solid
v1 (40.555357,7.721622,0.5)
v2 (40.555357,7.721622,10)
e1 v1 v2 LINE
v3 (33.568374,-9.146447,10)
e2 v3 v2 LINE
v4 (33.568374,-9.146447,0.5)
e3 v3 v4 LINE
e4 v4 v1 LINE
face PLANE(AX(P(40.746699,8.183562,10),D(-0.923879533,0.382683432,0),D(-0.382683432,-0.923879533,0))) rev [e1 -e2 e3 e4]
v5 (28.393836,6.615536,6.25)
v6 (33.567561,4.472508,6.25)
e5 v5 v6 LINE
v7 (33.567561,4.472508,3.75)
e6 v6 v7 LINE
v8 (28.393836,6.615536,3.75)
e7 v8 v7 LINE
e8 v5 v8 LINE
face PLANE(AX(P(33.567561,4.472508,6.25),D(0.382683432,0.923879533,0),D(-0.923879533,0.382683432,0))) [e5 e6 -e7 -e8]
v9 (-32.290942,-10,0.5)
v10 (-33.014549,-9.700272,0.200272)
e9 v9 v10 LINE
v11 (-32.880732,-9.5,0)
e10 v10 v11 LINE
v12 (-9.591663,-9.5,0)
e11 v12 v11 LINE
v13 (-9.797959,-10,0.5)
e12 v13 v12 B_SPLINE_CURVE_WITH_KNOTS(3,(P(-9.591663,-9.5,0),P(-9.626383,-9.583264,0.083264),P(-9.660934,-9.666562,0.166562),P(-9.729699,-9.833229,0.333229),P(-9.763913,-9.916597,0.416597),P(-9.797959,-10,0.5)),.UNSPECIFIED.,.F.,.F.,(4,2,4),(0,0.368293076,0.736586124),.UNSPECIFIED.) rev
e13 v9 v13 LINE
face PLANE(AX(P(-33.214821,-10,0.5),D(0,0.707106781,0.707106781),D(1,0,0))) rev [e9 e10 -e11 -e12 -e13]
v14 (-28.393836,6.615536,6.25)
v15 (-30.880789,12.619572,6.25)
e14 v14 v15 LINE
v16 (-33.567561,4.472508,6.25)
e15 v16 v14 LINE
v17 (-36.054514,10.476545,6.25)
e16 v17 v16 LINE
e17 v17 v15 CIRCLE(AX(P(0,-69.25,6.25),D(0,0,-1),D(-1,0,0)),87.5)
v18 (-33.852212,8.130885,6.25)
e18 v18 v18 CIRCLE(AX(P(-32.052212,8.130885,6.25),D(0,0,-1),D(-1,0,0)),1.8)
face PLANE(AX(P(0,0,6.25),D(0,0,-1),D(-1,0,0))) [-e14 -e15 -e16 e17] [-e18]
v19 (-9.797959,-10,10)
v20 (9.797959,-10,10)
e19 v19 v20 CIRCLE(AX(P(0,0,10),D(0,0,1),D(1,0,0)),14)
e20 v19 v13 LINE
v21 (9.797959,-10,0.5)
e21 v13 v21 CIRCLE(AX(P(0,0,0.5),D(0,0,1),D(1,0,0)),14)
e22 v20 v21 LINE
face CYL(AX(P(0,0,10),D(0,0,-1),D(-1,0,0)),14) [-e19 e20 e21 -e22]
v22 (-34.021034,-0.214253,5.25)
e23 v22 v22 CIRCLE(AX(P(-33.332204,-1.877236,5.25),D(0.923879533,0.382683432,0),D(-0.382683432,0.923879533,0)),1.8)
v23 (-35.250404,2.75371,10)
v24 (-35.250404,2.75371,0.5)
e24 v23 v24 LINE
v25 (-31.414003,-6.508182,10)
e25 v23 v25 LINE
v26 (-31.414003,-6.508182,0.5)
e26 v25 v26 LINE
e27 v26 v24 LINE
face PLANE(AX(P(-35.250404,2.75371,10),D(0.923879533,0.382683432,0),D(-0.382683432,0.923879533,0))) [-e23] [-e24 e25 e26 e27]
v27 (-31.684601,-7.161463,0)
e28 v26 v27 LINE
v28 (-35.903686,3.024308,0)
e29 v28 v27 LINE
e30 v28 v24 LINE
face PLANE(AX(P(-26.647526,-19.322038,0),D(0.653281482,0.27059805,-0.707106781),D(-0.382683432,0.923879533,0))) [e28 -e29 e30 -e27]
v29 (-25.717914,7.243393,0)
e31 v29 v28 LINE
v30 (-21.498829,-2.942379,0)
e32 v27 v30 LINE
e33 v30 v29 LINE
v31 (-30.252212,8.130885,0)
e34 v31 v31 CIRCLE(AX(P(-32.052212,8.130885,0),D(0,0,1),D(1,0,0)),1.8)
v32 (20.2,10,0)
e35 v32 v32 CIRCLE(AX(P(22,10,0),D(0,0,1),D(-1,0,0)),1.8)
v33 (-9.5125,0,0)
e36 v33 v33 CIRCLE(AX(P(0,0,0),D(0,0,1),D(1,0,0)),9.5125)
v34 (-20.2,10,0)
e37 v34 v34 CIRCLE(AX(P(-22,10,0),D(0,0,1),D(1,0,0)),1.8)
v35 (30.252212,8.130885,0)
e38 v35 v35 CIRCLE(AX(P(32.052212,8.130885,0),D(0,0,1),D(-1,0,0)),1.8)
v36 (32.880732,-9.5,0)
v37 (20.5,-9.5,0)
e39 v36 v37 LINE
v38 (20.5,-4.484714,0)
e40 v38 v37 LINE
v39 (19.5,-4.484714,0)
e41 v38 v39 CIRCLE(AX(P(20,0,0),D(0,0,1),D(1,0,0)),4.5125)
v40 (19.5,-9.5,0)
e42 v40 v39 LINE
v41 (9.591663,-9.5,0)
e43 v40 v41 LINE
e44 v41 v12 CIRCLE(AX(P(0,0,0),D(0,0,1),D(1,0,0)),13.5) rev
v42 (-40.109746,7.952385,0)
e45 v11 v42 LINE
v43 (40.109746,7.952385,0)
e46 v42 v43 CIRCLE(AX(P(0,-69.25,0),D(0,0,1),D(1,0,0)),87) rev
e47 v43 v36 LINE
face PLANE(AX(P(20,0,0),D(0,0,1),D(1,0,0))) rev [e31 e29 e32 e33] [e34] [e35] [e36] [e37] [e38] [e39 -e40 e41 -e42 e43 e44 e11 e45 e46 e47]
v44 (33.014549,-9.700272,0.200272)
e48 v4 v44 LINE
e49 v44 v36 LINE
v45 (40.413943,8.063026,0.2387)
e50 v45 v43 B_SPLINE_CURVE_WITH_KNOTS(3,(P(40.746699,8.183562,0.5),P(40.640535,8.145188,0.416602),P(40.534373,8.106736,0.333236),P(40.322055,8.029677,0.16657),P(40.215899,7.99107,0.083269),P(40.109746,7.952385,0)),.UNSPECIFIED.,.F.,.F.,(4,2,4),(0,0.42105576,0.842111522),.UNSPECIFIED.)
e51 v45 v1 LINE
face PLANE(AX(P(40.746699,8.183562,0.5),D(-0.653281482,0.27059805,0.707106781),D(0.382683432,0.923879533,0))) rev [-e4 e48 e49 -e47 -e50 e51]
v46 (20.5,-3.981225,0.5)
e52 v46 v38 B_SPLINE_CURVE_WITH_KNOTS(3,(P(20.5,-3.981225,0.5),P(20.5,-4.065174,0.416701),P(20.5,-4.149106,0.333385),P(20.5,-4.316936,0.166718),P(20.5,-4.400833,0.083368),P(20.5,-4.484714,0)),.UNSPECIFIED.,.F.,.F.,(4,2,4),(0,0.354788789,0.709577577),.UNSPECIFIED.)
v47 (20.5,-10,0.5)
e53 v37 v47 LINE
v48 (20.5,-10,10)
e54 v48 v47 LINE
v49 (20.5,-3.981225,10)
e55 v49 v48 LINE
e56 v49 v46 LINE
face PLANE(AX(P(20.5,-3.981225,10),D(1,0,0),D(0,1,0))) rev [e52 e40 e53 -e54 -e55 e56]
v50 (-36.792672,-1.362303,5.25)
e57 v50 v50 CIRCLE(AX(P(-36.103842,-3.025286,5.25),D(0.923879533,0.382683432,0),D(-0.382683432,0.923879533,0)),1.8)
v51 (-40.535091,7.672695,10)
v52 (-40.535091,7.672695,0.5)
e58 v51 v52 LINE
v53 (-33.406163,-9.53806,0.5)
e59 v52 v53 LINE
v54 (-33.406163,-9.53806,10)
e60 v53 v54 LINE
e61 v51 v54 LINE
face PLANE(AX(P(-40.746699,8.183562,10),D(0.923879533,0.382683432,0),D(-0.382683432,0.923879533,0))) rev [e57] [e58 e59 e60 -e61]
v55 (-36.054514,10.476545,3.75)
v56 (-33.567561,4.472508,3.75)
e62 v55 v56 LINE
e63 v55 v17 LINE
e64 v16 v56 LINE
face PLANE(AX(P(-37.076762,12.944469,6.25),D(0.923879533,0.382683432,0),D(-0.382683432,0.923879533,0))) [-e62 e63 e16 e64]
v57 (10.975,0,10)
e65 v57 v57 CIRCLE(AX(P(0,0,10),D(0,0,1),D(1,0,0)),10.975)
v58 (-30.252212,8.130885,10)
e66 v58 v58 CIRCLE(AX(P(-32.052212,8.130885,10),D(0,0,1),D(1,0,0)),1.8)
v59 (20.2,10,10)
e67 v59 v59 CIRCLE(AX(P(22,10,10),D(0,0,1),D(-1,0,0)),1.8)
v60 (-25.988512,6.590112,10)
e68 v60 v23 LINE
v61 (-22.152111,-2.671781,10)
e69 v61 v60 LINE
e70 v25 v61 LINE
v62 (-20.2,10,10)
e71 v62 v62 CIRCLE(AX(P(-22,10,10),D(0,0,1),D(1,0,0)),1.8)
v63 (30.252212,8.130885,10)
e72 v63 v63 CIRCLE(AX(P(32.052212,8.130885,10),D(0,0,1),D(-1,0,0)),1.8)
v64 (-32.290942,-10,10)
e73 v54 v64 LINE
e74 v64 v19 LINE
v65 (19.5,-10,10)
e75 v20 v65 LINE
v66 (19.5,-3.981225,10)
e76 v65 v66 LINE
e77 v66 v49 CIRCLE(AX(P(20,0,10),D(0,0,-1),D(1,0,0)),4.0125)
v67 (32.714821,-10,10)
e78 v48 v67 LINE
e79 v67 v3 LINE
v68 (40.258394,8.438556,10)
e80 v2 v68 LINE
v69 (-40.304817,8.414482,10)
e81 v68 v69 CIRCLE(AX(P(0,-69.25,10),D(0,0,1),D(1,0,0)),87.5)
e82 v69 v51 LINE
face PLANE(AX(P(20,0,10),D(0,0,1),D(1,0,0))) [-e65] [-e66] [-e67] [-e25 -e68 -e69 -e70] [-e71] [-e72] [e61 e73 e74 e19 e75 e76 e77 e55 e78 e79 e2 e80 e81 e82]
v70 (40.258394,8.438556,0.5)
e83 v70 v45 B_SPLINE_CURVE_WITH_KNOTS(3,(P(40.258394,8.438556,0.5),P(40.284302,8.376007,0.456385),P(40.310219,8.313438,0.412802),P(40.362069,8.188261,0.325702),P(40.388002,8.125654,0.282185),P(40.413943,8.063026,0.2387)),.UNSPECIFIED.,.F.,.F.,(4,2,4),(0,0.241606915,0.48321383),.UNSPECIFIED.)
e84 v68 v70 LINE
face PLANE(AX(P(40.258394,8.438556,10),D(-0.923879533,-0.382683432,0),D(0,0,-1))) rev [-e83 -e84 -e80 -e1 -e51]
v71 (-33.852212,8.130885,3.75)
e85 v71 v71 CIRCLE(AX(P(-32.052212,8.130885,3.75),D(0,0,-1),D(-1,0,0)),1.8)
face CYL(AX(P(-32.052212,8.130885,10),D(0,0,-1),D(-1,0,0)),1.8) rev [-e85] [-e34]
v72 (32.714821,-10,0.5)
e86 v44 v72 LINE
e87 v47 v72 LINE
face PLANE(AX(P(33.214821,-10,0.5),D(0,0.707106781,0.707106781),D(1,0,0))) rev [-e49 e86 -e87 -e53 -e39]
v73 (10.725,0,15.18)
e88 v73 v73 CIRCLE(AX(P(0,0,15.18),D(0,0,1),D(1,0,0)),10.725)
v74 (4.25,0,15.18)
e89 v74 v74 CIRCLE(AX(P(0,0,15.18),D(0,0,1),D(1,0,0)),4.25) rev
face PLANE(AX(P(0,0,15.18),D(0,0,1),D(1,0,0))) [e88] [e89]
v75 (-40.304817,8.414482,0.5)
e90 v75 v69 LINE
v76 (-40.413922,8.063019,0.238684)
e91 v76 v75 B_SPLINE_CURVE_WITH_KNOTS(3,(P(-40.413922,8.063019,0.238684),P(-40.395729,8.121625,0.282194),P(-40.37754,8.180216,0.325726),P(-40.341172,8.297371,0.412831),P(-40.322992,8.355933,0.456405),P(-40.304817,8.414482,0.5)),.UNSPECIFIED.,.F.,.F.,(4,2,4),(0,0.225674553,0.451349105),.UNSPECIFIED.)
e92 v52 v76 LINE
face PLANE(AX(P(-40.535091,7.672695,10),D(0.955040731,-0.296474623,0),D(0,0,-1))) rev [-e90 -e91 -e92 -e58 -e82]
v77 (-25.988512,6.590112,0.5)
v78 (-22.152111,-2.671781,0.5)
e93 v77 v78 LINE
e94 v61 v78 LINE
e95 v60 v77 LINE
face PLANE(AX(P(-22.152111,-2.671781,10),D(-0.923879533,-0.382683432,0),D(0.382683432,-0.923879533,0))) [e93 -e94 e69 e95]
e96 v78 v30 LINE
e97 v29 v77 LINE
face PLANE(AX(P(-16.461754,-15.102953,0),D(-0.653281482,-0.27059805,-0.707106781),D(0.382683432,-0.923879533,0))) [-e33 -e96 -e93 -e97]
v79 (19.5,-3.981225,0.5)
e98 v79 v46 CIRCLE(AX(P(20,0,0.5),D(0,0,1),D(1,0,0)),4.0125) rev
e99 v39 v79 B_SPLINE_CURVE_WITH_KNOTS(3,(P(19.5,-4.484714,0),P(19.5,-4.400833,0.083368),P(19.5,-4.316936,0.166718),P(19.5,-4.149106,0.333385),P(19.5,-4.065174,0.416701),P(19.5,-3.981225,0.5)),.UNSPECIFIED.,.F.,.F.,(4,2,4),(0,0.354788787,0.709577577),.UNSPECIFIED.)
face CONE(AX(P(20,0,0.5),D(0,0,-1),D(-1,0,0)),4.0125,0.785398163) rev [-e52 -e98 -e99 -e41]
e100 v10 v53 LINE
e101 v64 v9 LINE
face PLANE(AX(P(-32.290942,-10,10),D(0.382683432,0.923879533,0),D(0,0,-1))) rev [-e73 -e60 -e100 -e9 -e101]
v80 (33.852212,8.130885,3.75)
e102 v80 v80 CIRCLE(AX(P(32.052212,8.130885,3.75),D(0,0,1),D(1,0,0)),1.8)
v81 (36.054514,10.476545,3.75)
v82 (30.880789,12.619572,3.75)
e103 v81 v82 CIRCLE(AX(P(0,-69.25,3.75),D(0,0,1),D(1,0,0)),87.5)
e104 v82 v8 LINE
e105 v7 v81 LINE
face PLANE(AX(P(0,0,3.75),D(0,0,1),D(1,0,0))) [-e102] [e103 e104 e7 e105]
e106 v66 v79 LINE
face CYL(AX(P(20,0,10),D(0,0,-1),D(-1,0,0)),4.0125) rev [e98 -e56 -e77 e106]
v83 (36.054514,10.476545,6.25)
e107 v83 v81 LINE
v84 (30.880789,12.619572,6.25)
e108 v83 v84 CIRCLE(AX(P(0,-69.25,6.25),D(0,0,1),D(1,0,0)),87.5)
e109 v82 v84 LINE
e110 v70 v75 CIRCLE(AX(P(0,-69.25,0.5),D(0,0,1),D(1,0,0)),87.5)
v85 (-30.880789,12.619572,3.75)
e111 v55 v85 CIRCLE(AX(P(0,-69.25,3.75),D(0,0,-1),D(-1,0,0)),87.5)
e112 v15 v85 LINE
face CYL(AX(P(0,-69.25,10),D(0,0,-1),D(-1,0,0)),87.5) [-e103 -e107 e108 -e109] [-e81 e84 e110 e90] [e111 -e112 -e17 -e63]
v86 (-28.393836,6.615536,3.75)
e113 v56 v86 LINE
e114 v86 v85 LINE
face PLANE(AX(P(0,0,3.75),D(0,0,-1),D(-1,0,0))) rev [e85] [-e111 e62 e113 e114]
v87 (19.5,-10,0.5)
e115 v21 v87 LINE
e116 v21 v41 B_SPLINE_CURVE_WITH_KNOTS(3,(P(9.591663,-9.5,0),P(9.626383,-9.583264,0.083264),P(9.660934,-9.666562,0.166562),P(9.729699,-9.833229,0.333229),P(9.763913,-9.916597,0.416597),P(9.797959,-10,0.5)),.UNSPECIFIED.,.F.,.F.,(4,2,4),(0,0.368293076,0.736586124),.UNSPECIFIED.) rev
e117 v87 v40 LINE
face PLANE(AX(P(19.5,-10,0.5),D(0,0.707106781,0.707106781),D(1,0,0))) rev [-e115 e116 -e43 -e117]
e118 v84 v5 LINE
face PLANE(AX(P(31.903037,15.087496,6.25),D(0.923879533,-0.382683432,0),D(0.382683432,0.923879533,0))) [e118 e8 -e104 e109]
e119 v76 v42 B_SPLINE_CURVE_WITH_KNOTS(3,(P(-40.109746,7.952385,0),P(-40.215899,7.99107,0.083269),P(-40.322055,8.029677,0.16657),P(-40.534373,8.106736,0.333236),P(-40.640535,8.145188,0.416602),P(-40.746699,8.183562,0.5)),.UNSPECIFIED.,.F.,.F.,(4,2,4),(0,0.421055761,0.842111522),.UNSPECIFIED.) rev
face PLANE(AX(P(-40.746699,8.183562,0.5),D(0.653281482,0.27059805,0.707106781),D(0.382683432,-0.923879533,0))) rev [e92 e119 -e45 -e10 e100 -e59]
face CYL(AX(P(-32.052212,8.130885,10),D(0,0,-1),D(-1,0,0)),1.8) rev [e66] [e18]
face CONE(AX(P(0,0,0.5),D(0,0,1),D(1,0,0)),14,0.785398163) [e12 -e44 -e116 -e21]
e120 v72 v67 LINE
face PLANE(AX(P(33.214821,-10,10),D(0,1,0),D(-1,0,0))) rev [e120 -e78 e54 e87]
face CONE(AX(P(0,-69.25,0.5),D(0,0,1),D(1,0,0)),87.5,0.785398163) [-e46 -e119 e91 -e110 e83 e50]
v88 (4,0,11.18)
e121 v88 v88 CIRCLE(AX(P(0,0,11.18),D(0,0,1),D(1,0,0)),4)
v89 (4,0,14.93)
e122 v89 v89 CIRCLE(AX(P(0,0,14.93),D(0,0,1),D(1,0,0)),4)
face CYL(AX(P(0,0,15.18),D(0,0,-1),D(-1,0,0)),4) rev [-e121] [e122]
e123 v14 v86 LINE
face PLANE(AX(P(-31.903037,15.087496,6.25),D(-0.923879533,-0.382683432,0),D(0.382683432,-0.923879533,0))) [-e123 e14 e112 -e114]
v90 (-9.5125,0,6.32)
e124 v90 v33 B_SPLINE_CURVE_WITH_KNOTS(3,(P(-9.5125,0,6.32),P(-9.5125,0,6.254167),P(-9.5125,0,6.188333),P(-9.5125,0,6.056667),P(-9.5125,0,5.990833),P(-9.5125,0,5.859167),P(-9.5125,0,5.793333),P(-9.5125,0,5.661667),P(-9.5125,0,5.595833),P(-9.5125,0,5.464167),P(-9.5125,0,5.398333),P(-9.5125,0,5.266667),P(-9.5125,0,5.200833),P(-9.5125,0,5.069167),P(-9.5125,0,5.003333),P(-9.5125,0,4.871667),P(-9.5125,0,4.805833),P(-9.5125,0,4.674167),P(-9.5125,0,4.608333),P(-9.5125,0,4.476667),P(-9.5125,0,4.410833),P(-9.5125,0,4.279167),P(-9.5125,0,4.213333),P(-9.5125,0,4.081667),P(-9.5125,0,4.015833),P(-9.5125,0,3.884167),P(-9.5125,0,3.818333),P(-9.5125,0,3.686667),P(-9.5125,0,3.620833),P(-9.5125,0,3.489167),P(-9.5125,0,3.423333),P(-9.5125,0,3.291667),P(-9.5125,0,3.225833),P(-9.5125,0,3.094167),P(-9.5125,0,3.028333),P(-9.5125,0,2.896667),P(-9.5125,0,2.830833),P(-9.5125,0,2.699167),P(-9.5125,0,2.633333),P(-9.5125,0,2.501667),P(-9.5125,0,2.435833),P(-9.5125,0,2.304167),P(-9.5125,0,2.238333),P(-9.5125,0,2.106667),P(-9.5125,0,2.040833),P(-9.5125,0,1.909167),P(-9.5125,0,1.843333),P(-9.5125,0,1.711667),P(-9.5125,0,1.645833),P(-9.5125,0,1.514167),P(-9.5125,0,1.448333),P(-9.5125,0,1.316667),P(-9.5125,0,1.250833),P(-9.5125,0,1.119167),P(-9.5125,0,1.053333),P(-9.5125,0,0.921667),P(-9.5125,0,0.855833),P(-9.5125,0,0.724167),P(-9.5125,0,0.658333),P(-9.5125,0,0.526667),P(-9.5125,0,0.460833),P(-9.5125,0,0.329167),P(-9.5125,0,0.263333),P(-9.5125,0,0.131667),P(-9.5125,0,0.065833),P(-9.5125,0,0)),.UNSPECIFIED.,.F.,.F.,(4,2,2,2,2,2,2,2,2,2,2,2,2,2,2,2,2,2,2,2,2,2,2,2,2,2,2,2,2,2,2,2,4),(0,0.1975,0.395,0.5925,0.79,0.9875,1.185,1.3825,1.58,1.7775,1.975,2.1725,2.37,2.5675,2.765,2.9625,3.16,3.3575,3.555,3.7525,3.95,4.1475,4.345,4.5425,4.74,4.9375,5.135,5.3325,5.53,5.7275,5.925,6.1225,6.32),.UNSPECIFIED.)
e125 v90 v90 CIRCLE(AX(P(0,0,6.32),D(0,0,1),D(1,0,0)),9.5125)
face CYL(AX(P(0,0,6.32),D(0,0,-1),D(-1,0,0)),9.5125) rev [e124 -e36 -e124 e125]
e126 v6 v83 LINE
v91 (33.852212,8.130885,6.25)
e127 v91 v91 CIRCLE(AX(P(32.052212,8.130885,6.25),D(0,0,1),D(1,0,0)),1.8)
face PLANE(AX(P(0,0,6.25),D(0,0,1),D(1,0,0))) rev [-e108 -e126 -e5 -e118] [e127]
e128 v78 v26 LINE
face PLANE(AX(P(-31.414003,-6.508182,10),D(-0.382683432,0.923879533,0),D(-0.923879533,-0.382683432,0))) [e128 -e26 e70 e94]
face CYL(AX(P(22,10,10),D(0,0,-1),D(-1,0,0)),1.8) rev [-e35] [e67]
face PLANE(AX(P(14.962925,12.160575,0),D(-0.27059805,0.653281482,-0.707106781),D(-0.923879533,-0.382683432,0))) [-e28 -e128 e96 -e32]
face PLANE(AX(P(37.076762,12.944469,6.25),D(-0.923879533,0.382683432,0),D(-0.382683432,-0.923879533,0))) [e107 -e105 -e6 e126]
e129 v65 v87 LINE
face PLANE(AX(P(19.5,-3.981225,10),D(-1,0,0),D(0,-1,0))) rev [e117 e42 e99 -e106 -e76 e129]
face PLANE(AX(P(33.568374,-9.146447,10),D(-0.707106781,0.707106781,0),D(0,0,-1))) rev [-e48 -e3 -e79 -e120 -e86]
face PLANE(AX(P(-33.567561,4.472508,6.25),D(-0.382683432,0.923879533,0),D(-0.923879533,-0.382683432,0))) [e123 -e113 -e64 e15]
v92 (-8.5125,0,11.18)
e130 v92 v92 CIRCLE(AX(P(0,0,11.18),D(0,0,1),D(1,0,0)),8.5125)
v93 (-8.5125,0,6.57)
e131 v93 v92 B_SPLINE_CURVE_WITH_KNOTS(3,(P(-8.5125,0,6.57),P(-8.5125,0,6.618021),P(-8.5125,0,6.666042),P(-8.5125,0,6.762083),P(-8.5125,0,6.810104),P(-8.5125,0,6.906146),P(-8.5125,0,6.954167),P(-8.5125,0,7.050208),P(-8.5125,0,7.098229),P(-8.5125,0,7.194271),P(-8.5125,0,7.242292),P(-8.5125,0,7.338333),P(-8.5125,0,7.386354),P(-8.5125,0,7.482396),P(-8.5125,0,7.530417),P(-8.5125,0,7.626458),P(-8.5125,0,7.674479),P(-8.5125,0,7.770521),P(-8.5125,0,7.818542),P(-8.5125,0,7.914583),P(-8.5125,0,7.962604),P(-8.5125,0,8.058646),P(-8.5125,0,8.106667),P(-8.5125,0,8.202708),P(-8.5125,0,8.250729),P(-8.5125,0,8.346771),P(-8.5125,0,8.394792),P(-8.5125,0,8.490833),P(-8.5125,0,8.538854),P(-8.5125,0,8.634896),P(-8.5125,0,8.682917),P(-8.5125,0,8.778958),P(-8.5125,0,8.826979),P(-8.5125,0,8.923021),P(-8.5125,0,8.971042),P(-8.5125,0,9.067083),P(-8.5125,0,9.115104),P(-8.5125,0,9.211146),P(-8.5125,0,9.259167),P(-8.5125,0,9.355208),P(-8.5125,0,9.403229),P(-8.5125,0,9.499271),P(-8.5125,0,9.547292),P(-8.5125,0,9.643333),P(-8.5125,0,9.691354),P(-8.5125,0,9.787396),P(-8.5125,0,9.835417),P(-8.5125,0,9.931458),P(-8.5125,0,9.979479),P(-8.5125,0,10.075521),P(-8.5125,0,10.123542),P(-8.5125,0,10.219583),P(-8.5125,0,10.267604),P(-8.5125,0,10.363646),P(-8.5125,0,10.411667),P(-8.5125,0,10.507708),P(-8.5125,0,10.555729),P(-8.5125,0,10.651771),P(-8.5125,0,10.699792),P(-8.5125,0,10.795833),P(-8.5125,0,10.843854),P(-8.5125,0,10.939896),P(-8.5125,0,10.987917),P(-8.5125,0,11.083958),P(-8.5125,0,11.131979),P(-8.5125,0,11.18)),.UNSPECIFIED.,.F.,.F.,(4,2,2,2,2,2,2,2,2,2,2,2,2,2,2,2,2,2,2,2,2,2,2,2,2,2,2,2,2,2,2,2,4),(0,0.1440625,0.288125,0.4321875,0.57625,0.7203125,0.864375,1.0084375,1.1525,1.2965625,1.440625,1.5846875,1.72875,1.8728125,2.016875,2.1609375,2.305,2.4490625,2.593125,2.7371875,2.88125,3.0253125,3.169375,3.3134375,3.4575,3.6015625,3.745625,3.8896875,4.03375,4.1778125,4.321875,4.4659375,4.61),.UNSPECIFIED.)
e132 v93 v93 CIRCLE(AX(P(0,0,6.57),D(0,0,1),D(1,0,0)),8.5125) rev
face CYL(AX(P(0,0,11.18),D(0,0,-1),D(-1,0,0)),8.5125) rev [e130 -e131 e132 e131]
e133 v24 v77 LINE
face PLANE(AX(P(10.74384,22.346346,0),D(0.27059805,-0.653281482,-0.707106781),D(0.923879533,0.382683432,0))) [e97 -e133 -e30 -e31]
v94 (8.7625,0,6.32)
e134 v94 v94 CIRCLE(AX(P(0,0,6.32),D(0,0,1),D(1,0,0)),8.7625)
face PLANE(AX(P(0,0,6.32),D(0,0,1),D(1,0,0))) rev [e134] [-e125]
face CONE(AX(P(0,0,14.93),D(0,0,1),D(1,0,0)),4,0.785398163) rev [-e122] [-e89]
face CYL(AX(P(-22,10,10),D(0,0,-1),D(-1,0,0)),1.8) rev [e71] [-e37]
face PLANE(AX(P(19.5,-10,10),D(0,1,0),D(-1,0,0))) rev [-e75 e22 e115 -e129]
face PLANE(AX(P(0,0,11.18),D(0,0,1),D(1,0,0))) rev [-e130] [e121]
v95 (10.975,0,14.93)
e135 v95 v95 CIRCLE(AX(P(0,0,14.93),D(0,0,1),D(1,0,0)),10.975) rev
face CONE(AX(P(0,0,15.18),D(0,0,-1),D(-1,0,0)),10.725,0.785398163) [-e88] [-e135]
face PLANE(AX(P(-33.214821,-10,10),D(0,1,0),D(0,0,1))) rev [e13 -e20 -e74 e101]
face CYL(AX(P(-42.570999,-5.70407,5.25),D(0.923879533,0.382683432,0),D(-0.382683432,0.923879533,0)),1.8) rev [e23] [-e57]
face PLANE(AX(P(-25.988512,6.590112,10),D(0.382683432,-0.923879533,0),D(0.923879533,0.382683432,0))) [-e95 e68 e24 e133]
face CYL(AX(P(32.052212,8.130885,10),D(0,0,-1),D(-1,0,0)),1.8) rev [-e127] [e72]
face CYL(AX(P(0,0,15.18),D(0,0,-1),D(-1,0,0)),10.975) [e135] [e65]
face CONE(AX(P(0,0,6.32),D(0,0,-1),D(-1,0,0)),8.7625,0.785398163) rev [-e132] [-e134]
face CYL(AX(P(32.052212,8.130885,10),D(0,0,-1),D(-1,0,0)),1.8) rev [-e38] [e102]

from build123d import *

# Parameters (mm, degrees)
SKETCH1_R           = 5
SKETCH1_R_2         = 1.8
BOSS_EXTRUDE1_DEPTH = 10
CHAMFER1_SIZE       = 0.5
CUT_EXTRUDE2_DEPTH  = 2.5
CHAMFER2_SIZE       = 0.5
SKETCH4_R           = 1.8
CUT_EXTRUDE3_DEPTH  = 10
CHAMFER3_SIZE       = 0.5
CHAMFER3_SIZE_2     = 0.923879533
CHAMFER3_SIZE_3     = 0.552958444
SKETCH7_R           = 10.975
SKETCH7_R_2         = 4
BOSS_EXTRUDE2_DEPTH = 5.18
SKETCH8_R           = 8.5125
CUT_EXTRUDE6_DEPTH  = 11.18
SKETCH9_R           = 9.5125
CUT_EXTRUDE8_DEPTH  = 6.32
CHAMFER4_SIZE       = 0.25


with BuildPart() as part:
    # Sketch1 → Boss-Extrude1 (new body)
    with BuildSketch(Plane.XY):
        with BuildLine():
            Line((-40.746699048, 8.183561953), (-33.214821075, -10))
            Line((-33.214821075, -10), (-9.797958971, -10))
            ThreePointArc((-9.797958971, -10), (0, -14), (9.797958971, -10))
            Line((9.797958971, -10), (19.5, -10))
            Line((19.5, -10), (19.5, -3.981225471))
            ThreePointArc((19.5, -3.981225471), (20, 4.0125), (20.5, -3.981225471))
            Line((20.5, -3.981225471), (20.5, -10))
            Line((20.5, -10), (33.214821075, -10))
            Line((33.214821075, -10), (40.746699048, 8.183561953))
            ThreePointArc((40.746699048, 8.183561953), (0, 18.25), (-40.746699048, 8.183561953))
        make_face()
        Circle(SKETCH1_R, mode=Mode.SUBTRACT)
        with Locations((-32.052211881, 8.130884627)):
            Circle(SKETCH1_R_2, mode=Mode.SUBTRACT)
        with Locations(Location((32.052211881, 8.130884627, 0), (0, 0, 180))):
            Circle(SKETCH1_R_2, mode=Mode.SUBTRACT)
        with Locations((-22, 10)):
            Circle(SKETCH1_R_2, mode=Mode.SUBTRACT)
        with Locations(Location((22, 10, 0), (0, 0, 180))):
            Circle(SKETCH1_R_2, mode=Mode.SUBTRACT)
        Polygon((-25.988511975, 6.5901118), (-35.250404289, 2.75371039), (-31.414002879, -6.508181923), (-22.152110566, -2.671780514), align=None, mode=Mode.SUBTRACT)
    extrude(amount=BOSS_EXTRUDE1_DEPTH)

    # Chamfer1
    chamfer1_edges = [part.edges().sort_by_distance(p)[0] for p in [
        (20, 4.0125, 0),
        (-24.070311271, 1.959165643, 0),
        (-30.619458132, 4.671911095, 0),
        (-33.332203584, -1.877235766, 0),
        (-26.783056723, -4.589981218, 0),
    ]]
    chamfer(chamfer1_edges, length=CHAMFER1_SIZE)

    # Sketch3 → Cut-Extrude2 (cut)
    with BuildSketch(Plane.XY.offset(3.75)):
        Polygon((-37.076762037, 12.944469155), (-33.567560961, 4.472508325), (-28.393835579, 6.615535546), (-31.903036655, 15.087496376), align=None)
        Polygon((37.076762037, 12.944469155), (33.567560961, 4.472508325), (28.393835579, 6.615535546), (31.903036655, 15.087496376), align=None)
    extrude(amount=CUT_EXTRUDE2_DEPTH, mode=Mode.SUBTRACT)

    # Chamfer2
    chamfer2_edges = [part.edges().sort_by_distance(p)[0] for p in [
        (14.648979486, -10, 0),
        (0, -14, 0),
        (-21.506390023, -10, 0),
        (-36.980760062, -0.908219024, 0),
        (0, 18.25, 0),
        (36.980760062, -0.908219024, 0),
        (26.857410538, -10, 0),
    ]]
    chamfer(chamfer2_edges, length=CHAMFER2_SIZE)

    # Sketch4 → Cut-Extrude3 (cut)
    with BuildSketch(Plane(origin=(-29.114518455, -12.059628406, 0), x_dir=(0, 0, -1), z_dir=(0.9238795325112882, 0.38268343236508634, 0))):
        with Locations(Location((-5.25, 11.021342374, 0), (0, 0, 90))):
            Circle(SKETCH4_R)
    extrude(amount=-CUT_EXTRUDE3_DEPTH, mode=Mode.SUBTRACT)

    # Chamfer3
    # the kernel refuses this chamfer: 0.923879533, 0.552958444, 0.5 mm, written as the material it takes off along each edge
    with BuildSketch(Plane(origin=(40.746699048, 8.183561953, -0.920037939), x_dir=(-0.38268343236508906, -0.923879532511287, 0), z_dir=(0, 0, 1))) as chamfer3_piece_1:
        with BuildLine():
            Line((CHAMFER3_SIZE, 0), (-0.048717445, -0.548717445))
            ThreePointArc((-0.048717445, -0.548717445), (-0.025540103, -0.282767493), (0, 0))
            Line((0, 0), (CHAMFER3_SIZE, 0))
        make_face()
    extrude(amount=12.340075878, mode=Mode.SUBTRACT)
    with BuildSketch(Plane(origin=(33.214821075, -10, -1.895315111), x_dir=(-1, 0, 0), z_dir=(0, 0, 1)), Plane(origin=(-33.214821075, -10, -1.895315111), x_dir=(-0.38268343236508656, 0.9238795325112881, 0), z_dir=(0, 0, 1))) as chamfer3_piece_2:
        Polygon((CHAMFER3_SIZE, 0), (-CHAMFER3_SIZE_2 * 0.382683432163, -CHAMFER3_SIZE_2 * 0.923879532023), (0, 0), align=None)
    extrude(amount=14.290630221, mode=Mode.SUBTRACT)
    with BuildSketch(Plane(origin=(-40.746699048, 8.183561953, -0.925350902), x_dir=(0.38268343236508684, -0.9238795325112881, 0), z_dir=(0, 0, 1))) as chamfer3_piece_3:
        with BuildLine():
            Line((CHAMFER3_SIZE_3, 0), (-0.04424113, 0.496614821))
            ThreePointArc((-0.04424113, 0.496614821), (-0.0231658, 0.256042208), (0, 0))
            Line((0, 0), (CHAMFER3_SIZE_3, 0))
        make_face()
    extrude(amount=12.350701805, mode=Mode.SUBTRACT)

    # Sketch7 → Boss-Extrude2 (add)
    with BuildSketch(Plane.XY.offset(10)):
        Circle(SKETCH7_R)
        Circle(SKETCH7_R_2, mode=Mode.SUBTRACT)
    extrude(amount=BOSS_EXTRUDE2_DEPTH)

    # Sketch8 → Cut-Extrude6 (cut)
    with BuildSketch(Plane.XY):
        with Locations(Location((0, 0, 0), (0, 0, 180))):
            Circle(SKETCH8_R)
    extrude(amount=CUT_EXTRUDE6_DEPTH, mode=Mode.SUBTRACT)

    # Sketch9 → Cut-Extrude8 (cut)
    with BuildSketch(Plane.XY):
        with Locations(Location((0, 0, 0), (0, 0, 180))):
            Circle(SKETCH9_R)
    extrude(amount=CUT_EXTRUDE8_DEPTH, mode=Mode.SUBTRACT)

    # Chamfer4
    chamfer4_edges = [part.edges().sort_by_distance(p)[0] for p in [
        (-10.975, 0, 15.18),
        (-4, 0, 15.18),
        (8.5125, 0, 6.32),
    ]]
    chamfer(chamfer4_edges, length=CHAMFER4_SIZE)


solid = part.part
